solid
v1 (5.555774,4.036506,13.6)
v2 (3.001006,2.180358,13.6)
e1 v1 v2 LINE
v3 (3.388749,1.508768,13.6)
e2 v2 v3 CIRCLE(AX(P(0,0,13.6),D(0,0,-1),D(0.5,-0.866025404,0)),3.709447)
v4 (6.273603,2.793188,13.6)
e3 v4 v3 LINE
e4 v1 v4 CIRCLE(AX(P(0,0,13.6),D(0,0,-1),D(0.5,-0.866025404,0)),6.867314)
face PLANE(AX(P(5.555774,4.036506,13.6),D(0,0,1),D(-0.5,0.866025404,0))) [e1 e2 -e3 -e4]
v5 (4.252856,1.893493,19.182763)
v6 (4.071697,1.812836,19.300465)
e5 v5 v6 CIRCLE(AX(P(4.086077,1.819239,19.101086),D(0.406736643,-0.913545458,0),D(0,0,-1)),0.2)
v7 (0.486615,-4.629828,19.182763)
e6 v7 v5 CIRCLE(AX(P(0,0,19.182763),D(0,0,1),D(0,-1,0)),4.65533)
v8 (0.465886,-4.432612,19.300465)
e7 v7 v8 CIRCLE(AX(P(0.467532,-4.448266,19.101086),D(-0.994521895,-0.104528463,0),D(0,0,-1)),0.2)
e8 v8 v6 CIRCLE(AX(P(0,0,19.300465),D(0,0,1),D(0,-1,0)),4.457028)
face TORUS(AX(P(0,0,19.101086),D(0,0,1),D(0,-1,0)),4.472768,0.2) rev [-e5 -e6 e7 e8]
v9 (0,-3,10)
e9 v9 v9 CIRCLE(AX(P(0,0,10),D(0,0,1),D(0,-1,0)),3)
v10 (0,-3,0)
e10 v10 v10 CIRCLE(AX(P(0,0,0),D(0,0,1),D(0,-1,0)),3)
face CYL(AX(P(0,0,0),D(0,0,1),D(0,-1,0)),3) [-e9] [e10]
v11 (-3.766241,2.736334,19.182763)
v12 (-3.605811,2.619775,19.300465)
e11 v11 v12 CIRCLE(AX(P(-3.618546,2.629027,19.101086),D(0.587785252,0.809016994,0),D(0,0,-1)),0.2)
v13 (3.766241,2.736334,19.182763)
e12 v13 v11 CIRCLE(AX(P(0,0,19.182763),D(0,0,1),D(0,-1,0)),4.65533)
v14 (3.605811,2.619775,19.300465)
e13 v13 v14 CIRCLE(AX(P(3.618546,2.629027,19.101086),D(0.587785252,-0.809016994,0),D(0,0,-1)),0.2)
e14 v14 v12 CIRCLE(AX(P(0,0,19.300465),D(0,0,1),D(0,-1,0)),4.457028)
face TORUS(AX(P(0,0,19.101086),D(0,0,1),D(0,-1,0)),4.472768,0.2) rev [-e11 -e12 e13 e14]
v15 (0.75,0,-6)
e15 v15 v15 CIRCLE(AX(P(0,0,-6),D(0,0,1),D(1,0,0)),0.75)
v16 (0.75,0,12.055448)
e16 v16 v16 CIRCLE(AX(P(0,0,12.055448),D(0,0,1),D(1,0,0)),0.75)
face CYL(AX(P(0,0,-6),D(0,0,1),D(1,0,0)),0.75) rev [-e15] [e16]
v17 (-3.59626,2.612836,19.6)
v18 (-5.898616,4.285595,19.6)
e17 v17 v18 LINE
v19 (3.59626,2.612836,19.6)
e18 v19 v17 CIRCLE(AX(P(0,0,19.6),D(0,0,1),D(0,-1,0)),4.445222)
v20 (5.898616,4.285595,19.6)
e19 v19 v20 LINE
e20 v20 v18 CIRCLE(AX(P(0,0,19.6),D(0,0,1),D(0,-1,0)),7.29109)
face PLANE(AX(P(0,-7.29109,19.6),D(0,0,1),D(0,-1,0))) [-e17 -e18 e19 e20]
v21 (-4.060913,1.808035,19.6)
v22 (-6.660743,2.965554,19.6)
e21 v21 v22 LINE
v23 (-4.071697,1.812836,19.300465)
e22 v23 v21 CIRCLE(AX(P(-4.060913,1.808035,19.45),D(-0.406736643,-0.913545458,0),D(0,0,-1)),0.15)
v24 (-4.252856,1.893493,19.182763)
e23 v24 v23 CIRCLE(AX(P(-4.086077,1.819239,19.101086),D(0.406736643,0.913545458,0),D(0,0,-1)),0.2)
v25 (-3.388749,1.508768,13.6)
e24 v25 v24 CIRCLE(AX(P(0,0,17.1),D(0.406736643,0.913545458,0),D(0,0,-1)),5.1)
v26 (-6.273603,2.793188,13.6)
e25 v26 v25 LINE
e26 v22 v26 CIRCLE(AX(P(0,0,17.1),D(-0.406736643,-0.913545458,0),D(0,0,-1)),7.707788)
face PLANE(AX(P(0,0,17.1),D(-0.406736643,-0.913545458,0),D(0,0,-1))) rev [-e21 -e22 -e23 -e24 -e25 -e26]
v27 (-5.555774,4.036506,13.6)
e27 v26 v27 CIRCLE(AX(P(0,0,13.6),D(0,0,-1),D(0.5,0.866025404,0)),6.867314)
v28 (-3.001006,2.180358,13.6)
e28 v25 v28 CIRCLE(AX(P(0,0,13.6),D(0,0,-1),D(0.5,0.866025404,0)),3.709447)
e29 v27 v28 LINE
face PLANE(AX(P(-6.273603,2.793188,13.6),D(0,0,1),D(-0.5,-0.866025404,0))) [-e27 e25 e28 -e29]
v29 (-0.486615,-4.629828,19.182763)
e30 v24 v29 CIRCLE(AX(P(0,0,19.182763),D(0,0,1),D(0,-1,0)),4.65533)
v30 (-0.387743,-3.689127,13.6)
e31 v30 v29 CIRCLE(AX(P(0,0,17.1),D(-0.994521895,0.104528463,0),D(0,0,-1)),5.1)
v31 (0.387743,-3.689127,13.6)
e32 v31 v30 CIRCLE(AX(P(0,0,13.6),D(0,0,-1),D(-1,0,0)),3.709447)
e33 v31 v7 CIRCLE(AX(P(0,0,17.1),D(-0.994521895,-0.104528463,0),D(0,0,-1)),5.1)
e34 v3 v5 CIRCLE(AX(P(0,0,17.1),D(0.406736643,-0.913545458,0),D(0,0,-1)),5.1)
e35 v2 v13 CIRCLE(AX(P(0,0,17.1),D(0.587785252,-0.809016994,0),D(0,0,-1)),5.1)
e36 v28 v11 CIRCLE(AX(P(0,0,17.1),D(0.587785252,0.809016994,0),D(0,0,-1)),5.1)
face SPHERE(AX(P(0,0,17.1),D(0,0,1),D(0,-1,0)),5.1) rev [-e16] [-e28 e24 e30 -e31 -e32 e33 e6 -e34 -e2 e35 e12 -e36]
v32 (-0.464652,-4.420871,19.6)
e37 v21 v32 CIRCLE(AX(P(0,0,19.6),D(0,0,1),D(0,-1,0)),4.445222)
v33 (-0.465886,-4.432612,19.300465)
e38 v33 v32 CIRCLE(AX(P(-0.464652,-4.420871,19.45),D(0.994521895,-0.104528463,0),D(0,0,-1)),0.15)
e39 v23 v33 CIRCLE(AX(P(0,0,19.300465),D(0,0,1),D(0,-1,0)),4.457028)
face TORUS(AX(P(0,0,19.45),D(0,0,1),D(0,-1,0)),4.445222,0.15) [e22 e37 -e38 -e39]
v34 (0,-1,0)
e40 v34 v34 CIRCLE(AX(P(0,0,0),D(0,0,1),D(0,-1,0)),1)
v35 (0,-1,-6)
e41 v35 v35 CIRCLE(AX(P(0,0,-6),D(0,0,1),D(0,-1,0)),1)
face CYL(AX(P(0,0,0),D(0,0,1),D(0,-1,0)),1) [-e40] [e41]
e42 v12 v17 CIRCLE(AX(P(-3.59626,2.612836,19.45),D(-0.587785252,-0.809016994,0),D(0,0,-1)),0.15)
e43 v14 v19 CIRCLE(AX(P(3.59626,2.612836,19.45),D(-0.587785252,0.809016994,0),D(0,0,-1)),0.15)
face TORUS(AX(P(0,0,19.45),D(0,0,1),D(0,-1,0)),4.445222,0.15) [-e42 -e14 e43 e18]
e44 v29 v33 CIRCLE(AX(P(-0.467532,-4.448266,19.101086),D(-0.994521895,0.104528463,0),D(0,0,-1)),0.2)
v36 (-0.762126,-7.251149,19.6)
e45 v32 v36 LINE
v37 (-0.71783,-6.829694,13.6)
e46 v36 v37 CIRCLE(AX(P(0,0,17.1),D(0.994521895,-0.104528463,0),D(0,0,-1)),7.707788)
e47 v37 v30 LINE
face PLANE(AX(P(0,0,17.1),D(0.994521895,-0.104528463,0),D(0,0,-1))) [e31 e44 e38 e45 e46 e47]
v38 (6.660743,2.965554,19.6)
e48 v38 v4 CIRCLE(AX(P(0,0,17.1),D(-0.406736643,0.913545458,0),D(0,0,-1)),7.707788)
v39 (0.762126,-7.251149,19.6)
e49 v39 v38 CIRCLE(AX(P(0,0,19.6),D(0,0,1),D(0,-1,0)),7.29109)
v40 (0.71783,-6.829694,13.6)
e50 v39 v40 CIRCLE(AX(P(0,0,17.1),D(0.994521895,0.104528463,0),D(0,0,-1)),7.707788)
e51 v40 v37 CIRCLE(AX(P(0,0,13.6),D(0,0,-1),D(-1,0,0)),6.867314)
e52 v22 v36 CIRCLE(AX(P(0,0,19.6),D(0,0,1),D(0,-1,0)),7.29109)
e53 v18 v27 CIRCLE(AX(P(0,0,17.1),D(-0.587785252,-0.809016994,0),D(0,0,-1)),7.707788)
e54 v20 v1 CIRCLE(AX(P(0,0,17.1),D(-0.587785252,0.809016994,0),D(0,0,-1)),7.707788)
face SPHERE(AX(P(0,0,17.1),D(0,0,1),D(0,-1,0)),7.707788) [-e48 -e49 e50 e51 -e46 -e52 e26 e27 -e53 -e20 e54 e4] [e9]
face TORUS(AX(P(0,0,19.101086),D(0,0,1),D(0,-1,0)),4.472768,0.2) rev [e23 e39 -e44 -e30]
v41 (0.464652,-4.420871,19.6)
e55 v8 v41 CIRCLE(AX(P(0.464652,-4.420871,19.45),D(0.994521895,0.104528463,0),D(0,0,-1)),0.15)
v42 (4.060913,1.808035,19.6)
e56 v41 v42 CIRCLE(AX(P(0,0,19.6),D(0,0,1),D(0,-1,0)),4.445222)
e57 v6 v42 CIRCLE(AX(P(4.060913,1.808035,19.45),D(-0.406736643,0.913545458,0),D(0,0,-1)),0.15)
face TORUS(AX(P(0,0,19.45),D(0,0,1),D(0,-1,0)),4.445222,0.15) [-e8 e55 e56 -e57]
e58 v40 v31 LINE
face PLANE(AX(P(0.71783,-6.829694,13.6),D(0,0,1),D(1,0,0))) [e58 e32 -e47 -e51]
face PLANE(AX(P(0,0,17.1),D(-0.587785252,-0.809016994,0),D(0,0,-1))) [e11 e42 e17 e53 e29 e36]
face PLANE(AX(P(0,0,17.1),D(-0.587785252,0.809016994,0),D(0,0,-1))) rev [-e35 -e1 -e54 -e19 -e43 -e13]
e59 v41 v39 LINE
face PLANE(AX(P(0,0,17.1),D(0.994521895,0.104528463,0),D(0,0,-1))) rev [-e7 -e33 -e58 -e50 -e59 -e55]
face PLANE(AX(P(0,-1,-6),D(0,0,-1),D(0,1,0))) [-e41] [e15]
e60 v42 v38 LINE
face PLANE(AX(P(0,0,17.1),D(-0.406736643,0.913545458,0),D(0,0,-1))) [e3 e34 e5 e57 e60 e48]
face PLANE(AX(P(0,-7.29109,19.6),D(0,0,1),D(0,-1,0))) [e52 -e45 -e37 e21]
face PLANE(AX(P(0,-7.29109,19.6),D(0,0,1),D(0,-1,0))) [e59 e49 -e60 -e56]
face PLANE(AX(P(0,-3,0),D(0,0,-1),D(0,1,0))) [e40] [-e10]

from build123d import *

# Parameters (mm, degrees)
CORTAR_REVOLUCI_N1_START = 13.6
CORTAR_REVOLUCI_N1_DEPTH = 6
MATRIZC1_COUNT           = 3
CROQUIS4_R               = 0.75
CORTAR_EXTRUIR1_DEPTH    = 28.824090282


# Read off the part's stored shape, not the designer's step: Cortar-Revolución1
with BuildPart() as part:
    # Croquis1 → Revolución1 (revolve)
    with BuildSketch(Plane.YZ):
        with BuildLine():
            Line((-3, 0), (-3, 10))
            ThreePointArc((-3, 10), (-7.036805787, 13.954628111), (-7.291090453, 19.6))
            Line((-7.291090453, 19.6), (-4.445222154, 19.6))
            ThreePointArc((-4.445222154, 19.6), (-4.295338521, 19.444092675), (-4.45702764, 19.300465287))
            ThreePointArc((-4.45702764, 19.300465287), (-4.57485069, 19.273071665), (-4.655330258, 19.182762635))
            ThreePointArc((-4.655330258, 19.182762635), (-4.279724841, 14.326202011), (0, 12))
            Line((0, 12), (0, 0))
            Line((0, 0), (0, -6))
            Line((0, -6), (-1, -6))
            Line((-1, -6), (-1, 0))
            Line((-1, 0), (-3, 0))
        make_face()
    revolve(axis=Axis((0, 0, 0), (0, 0, -1)))

    # Cortar-Revolución1 outline → Cortar-Revolución1 (cut)
    with BuildSketch(Plane.XY.offset(CORTAR_REVOLUCI_N1_START)):
        Polygon((0.945938118, -9), (0.805683263, -7.665564198), (0.387742836, -3.689126657), (0.21020847, -2), (-0.21020847, -2), (-0.387742836, -3.689126657), (-0.805683263, -7.665564198), (-0.945938118, -9), align=None)
    cortar_revoluci_n1 = extrude(amount=CORTAR_REVOLUCI_N1_DEPTH, mode=Mode.SUBTRACT)

    # MatrizC1: Cortar-Revolución1 ×3 about axis
    matrizc1_axis = Axis((0, 0, 0), (0, 0, 1))
    for i in range(1, MATRIZC1_COUNT):
        add(cortar_revoluci_n1.rotate(matrizc1_axis, i * 360 / MATRIZC1_COUNT), mode=Mode.SUBTRACT)

    # Croquis4 → Cortar-Extruir1 (cut, through all)
    with BuildSketch(Plane.XY.offset(19.6)):
        Circle(CROQUIS4_R)
    extrude(amount=-CORTAR_EXTRUIR1_DEPTH, mode=Mode.SUBTRACT)


solid = part.part
